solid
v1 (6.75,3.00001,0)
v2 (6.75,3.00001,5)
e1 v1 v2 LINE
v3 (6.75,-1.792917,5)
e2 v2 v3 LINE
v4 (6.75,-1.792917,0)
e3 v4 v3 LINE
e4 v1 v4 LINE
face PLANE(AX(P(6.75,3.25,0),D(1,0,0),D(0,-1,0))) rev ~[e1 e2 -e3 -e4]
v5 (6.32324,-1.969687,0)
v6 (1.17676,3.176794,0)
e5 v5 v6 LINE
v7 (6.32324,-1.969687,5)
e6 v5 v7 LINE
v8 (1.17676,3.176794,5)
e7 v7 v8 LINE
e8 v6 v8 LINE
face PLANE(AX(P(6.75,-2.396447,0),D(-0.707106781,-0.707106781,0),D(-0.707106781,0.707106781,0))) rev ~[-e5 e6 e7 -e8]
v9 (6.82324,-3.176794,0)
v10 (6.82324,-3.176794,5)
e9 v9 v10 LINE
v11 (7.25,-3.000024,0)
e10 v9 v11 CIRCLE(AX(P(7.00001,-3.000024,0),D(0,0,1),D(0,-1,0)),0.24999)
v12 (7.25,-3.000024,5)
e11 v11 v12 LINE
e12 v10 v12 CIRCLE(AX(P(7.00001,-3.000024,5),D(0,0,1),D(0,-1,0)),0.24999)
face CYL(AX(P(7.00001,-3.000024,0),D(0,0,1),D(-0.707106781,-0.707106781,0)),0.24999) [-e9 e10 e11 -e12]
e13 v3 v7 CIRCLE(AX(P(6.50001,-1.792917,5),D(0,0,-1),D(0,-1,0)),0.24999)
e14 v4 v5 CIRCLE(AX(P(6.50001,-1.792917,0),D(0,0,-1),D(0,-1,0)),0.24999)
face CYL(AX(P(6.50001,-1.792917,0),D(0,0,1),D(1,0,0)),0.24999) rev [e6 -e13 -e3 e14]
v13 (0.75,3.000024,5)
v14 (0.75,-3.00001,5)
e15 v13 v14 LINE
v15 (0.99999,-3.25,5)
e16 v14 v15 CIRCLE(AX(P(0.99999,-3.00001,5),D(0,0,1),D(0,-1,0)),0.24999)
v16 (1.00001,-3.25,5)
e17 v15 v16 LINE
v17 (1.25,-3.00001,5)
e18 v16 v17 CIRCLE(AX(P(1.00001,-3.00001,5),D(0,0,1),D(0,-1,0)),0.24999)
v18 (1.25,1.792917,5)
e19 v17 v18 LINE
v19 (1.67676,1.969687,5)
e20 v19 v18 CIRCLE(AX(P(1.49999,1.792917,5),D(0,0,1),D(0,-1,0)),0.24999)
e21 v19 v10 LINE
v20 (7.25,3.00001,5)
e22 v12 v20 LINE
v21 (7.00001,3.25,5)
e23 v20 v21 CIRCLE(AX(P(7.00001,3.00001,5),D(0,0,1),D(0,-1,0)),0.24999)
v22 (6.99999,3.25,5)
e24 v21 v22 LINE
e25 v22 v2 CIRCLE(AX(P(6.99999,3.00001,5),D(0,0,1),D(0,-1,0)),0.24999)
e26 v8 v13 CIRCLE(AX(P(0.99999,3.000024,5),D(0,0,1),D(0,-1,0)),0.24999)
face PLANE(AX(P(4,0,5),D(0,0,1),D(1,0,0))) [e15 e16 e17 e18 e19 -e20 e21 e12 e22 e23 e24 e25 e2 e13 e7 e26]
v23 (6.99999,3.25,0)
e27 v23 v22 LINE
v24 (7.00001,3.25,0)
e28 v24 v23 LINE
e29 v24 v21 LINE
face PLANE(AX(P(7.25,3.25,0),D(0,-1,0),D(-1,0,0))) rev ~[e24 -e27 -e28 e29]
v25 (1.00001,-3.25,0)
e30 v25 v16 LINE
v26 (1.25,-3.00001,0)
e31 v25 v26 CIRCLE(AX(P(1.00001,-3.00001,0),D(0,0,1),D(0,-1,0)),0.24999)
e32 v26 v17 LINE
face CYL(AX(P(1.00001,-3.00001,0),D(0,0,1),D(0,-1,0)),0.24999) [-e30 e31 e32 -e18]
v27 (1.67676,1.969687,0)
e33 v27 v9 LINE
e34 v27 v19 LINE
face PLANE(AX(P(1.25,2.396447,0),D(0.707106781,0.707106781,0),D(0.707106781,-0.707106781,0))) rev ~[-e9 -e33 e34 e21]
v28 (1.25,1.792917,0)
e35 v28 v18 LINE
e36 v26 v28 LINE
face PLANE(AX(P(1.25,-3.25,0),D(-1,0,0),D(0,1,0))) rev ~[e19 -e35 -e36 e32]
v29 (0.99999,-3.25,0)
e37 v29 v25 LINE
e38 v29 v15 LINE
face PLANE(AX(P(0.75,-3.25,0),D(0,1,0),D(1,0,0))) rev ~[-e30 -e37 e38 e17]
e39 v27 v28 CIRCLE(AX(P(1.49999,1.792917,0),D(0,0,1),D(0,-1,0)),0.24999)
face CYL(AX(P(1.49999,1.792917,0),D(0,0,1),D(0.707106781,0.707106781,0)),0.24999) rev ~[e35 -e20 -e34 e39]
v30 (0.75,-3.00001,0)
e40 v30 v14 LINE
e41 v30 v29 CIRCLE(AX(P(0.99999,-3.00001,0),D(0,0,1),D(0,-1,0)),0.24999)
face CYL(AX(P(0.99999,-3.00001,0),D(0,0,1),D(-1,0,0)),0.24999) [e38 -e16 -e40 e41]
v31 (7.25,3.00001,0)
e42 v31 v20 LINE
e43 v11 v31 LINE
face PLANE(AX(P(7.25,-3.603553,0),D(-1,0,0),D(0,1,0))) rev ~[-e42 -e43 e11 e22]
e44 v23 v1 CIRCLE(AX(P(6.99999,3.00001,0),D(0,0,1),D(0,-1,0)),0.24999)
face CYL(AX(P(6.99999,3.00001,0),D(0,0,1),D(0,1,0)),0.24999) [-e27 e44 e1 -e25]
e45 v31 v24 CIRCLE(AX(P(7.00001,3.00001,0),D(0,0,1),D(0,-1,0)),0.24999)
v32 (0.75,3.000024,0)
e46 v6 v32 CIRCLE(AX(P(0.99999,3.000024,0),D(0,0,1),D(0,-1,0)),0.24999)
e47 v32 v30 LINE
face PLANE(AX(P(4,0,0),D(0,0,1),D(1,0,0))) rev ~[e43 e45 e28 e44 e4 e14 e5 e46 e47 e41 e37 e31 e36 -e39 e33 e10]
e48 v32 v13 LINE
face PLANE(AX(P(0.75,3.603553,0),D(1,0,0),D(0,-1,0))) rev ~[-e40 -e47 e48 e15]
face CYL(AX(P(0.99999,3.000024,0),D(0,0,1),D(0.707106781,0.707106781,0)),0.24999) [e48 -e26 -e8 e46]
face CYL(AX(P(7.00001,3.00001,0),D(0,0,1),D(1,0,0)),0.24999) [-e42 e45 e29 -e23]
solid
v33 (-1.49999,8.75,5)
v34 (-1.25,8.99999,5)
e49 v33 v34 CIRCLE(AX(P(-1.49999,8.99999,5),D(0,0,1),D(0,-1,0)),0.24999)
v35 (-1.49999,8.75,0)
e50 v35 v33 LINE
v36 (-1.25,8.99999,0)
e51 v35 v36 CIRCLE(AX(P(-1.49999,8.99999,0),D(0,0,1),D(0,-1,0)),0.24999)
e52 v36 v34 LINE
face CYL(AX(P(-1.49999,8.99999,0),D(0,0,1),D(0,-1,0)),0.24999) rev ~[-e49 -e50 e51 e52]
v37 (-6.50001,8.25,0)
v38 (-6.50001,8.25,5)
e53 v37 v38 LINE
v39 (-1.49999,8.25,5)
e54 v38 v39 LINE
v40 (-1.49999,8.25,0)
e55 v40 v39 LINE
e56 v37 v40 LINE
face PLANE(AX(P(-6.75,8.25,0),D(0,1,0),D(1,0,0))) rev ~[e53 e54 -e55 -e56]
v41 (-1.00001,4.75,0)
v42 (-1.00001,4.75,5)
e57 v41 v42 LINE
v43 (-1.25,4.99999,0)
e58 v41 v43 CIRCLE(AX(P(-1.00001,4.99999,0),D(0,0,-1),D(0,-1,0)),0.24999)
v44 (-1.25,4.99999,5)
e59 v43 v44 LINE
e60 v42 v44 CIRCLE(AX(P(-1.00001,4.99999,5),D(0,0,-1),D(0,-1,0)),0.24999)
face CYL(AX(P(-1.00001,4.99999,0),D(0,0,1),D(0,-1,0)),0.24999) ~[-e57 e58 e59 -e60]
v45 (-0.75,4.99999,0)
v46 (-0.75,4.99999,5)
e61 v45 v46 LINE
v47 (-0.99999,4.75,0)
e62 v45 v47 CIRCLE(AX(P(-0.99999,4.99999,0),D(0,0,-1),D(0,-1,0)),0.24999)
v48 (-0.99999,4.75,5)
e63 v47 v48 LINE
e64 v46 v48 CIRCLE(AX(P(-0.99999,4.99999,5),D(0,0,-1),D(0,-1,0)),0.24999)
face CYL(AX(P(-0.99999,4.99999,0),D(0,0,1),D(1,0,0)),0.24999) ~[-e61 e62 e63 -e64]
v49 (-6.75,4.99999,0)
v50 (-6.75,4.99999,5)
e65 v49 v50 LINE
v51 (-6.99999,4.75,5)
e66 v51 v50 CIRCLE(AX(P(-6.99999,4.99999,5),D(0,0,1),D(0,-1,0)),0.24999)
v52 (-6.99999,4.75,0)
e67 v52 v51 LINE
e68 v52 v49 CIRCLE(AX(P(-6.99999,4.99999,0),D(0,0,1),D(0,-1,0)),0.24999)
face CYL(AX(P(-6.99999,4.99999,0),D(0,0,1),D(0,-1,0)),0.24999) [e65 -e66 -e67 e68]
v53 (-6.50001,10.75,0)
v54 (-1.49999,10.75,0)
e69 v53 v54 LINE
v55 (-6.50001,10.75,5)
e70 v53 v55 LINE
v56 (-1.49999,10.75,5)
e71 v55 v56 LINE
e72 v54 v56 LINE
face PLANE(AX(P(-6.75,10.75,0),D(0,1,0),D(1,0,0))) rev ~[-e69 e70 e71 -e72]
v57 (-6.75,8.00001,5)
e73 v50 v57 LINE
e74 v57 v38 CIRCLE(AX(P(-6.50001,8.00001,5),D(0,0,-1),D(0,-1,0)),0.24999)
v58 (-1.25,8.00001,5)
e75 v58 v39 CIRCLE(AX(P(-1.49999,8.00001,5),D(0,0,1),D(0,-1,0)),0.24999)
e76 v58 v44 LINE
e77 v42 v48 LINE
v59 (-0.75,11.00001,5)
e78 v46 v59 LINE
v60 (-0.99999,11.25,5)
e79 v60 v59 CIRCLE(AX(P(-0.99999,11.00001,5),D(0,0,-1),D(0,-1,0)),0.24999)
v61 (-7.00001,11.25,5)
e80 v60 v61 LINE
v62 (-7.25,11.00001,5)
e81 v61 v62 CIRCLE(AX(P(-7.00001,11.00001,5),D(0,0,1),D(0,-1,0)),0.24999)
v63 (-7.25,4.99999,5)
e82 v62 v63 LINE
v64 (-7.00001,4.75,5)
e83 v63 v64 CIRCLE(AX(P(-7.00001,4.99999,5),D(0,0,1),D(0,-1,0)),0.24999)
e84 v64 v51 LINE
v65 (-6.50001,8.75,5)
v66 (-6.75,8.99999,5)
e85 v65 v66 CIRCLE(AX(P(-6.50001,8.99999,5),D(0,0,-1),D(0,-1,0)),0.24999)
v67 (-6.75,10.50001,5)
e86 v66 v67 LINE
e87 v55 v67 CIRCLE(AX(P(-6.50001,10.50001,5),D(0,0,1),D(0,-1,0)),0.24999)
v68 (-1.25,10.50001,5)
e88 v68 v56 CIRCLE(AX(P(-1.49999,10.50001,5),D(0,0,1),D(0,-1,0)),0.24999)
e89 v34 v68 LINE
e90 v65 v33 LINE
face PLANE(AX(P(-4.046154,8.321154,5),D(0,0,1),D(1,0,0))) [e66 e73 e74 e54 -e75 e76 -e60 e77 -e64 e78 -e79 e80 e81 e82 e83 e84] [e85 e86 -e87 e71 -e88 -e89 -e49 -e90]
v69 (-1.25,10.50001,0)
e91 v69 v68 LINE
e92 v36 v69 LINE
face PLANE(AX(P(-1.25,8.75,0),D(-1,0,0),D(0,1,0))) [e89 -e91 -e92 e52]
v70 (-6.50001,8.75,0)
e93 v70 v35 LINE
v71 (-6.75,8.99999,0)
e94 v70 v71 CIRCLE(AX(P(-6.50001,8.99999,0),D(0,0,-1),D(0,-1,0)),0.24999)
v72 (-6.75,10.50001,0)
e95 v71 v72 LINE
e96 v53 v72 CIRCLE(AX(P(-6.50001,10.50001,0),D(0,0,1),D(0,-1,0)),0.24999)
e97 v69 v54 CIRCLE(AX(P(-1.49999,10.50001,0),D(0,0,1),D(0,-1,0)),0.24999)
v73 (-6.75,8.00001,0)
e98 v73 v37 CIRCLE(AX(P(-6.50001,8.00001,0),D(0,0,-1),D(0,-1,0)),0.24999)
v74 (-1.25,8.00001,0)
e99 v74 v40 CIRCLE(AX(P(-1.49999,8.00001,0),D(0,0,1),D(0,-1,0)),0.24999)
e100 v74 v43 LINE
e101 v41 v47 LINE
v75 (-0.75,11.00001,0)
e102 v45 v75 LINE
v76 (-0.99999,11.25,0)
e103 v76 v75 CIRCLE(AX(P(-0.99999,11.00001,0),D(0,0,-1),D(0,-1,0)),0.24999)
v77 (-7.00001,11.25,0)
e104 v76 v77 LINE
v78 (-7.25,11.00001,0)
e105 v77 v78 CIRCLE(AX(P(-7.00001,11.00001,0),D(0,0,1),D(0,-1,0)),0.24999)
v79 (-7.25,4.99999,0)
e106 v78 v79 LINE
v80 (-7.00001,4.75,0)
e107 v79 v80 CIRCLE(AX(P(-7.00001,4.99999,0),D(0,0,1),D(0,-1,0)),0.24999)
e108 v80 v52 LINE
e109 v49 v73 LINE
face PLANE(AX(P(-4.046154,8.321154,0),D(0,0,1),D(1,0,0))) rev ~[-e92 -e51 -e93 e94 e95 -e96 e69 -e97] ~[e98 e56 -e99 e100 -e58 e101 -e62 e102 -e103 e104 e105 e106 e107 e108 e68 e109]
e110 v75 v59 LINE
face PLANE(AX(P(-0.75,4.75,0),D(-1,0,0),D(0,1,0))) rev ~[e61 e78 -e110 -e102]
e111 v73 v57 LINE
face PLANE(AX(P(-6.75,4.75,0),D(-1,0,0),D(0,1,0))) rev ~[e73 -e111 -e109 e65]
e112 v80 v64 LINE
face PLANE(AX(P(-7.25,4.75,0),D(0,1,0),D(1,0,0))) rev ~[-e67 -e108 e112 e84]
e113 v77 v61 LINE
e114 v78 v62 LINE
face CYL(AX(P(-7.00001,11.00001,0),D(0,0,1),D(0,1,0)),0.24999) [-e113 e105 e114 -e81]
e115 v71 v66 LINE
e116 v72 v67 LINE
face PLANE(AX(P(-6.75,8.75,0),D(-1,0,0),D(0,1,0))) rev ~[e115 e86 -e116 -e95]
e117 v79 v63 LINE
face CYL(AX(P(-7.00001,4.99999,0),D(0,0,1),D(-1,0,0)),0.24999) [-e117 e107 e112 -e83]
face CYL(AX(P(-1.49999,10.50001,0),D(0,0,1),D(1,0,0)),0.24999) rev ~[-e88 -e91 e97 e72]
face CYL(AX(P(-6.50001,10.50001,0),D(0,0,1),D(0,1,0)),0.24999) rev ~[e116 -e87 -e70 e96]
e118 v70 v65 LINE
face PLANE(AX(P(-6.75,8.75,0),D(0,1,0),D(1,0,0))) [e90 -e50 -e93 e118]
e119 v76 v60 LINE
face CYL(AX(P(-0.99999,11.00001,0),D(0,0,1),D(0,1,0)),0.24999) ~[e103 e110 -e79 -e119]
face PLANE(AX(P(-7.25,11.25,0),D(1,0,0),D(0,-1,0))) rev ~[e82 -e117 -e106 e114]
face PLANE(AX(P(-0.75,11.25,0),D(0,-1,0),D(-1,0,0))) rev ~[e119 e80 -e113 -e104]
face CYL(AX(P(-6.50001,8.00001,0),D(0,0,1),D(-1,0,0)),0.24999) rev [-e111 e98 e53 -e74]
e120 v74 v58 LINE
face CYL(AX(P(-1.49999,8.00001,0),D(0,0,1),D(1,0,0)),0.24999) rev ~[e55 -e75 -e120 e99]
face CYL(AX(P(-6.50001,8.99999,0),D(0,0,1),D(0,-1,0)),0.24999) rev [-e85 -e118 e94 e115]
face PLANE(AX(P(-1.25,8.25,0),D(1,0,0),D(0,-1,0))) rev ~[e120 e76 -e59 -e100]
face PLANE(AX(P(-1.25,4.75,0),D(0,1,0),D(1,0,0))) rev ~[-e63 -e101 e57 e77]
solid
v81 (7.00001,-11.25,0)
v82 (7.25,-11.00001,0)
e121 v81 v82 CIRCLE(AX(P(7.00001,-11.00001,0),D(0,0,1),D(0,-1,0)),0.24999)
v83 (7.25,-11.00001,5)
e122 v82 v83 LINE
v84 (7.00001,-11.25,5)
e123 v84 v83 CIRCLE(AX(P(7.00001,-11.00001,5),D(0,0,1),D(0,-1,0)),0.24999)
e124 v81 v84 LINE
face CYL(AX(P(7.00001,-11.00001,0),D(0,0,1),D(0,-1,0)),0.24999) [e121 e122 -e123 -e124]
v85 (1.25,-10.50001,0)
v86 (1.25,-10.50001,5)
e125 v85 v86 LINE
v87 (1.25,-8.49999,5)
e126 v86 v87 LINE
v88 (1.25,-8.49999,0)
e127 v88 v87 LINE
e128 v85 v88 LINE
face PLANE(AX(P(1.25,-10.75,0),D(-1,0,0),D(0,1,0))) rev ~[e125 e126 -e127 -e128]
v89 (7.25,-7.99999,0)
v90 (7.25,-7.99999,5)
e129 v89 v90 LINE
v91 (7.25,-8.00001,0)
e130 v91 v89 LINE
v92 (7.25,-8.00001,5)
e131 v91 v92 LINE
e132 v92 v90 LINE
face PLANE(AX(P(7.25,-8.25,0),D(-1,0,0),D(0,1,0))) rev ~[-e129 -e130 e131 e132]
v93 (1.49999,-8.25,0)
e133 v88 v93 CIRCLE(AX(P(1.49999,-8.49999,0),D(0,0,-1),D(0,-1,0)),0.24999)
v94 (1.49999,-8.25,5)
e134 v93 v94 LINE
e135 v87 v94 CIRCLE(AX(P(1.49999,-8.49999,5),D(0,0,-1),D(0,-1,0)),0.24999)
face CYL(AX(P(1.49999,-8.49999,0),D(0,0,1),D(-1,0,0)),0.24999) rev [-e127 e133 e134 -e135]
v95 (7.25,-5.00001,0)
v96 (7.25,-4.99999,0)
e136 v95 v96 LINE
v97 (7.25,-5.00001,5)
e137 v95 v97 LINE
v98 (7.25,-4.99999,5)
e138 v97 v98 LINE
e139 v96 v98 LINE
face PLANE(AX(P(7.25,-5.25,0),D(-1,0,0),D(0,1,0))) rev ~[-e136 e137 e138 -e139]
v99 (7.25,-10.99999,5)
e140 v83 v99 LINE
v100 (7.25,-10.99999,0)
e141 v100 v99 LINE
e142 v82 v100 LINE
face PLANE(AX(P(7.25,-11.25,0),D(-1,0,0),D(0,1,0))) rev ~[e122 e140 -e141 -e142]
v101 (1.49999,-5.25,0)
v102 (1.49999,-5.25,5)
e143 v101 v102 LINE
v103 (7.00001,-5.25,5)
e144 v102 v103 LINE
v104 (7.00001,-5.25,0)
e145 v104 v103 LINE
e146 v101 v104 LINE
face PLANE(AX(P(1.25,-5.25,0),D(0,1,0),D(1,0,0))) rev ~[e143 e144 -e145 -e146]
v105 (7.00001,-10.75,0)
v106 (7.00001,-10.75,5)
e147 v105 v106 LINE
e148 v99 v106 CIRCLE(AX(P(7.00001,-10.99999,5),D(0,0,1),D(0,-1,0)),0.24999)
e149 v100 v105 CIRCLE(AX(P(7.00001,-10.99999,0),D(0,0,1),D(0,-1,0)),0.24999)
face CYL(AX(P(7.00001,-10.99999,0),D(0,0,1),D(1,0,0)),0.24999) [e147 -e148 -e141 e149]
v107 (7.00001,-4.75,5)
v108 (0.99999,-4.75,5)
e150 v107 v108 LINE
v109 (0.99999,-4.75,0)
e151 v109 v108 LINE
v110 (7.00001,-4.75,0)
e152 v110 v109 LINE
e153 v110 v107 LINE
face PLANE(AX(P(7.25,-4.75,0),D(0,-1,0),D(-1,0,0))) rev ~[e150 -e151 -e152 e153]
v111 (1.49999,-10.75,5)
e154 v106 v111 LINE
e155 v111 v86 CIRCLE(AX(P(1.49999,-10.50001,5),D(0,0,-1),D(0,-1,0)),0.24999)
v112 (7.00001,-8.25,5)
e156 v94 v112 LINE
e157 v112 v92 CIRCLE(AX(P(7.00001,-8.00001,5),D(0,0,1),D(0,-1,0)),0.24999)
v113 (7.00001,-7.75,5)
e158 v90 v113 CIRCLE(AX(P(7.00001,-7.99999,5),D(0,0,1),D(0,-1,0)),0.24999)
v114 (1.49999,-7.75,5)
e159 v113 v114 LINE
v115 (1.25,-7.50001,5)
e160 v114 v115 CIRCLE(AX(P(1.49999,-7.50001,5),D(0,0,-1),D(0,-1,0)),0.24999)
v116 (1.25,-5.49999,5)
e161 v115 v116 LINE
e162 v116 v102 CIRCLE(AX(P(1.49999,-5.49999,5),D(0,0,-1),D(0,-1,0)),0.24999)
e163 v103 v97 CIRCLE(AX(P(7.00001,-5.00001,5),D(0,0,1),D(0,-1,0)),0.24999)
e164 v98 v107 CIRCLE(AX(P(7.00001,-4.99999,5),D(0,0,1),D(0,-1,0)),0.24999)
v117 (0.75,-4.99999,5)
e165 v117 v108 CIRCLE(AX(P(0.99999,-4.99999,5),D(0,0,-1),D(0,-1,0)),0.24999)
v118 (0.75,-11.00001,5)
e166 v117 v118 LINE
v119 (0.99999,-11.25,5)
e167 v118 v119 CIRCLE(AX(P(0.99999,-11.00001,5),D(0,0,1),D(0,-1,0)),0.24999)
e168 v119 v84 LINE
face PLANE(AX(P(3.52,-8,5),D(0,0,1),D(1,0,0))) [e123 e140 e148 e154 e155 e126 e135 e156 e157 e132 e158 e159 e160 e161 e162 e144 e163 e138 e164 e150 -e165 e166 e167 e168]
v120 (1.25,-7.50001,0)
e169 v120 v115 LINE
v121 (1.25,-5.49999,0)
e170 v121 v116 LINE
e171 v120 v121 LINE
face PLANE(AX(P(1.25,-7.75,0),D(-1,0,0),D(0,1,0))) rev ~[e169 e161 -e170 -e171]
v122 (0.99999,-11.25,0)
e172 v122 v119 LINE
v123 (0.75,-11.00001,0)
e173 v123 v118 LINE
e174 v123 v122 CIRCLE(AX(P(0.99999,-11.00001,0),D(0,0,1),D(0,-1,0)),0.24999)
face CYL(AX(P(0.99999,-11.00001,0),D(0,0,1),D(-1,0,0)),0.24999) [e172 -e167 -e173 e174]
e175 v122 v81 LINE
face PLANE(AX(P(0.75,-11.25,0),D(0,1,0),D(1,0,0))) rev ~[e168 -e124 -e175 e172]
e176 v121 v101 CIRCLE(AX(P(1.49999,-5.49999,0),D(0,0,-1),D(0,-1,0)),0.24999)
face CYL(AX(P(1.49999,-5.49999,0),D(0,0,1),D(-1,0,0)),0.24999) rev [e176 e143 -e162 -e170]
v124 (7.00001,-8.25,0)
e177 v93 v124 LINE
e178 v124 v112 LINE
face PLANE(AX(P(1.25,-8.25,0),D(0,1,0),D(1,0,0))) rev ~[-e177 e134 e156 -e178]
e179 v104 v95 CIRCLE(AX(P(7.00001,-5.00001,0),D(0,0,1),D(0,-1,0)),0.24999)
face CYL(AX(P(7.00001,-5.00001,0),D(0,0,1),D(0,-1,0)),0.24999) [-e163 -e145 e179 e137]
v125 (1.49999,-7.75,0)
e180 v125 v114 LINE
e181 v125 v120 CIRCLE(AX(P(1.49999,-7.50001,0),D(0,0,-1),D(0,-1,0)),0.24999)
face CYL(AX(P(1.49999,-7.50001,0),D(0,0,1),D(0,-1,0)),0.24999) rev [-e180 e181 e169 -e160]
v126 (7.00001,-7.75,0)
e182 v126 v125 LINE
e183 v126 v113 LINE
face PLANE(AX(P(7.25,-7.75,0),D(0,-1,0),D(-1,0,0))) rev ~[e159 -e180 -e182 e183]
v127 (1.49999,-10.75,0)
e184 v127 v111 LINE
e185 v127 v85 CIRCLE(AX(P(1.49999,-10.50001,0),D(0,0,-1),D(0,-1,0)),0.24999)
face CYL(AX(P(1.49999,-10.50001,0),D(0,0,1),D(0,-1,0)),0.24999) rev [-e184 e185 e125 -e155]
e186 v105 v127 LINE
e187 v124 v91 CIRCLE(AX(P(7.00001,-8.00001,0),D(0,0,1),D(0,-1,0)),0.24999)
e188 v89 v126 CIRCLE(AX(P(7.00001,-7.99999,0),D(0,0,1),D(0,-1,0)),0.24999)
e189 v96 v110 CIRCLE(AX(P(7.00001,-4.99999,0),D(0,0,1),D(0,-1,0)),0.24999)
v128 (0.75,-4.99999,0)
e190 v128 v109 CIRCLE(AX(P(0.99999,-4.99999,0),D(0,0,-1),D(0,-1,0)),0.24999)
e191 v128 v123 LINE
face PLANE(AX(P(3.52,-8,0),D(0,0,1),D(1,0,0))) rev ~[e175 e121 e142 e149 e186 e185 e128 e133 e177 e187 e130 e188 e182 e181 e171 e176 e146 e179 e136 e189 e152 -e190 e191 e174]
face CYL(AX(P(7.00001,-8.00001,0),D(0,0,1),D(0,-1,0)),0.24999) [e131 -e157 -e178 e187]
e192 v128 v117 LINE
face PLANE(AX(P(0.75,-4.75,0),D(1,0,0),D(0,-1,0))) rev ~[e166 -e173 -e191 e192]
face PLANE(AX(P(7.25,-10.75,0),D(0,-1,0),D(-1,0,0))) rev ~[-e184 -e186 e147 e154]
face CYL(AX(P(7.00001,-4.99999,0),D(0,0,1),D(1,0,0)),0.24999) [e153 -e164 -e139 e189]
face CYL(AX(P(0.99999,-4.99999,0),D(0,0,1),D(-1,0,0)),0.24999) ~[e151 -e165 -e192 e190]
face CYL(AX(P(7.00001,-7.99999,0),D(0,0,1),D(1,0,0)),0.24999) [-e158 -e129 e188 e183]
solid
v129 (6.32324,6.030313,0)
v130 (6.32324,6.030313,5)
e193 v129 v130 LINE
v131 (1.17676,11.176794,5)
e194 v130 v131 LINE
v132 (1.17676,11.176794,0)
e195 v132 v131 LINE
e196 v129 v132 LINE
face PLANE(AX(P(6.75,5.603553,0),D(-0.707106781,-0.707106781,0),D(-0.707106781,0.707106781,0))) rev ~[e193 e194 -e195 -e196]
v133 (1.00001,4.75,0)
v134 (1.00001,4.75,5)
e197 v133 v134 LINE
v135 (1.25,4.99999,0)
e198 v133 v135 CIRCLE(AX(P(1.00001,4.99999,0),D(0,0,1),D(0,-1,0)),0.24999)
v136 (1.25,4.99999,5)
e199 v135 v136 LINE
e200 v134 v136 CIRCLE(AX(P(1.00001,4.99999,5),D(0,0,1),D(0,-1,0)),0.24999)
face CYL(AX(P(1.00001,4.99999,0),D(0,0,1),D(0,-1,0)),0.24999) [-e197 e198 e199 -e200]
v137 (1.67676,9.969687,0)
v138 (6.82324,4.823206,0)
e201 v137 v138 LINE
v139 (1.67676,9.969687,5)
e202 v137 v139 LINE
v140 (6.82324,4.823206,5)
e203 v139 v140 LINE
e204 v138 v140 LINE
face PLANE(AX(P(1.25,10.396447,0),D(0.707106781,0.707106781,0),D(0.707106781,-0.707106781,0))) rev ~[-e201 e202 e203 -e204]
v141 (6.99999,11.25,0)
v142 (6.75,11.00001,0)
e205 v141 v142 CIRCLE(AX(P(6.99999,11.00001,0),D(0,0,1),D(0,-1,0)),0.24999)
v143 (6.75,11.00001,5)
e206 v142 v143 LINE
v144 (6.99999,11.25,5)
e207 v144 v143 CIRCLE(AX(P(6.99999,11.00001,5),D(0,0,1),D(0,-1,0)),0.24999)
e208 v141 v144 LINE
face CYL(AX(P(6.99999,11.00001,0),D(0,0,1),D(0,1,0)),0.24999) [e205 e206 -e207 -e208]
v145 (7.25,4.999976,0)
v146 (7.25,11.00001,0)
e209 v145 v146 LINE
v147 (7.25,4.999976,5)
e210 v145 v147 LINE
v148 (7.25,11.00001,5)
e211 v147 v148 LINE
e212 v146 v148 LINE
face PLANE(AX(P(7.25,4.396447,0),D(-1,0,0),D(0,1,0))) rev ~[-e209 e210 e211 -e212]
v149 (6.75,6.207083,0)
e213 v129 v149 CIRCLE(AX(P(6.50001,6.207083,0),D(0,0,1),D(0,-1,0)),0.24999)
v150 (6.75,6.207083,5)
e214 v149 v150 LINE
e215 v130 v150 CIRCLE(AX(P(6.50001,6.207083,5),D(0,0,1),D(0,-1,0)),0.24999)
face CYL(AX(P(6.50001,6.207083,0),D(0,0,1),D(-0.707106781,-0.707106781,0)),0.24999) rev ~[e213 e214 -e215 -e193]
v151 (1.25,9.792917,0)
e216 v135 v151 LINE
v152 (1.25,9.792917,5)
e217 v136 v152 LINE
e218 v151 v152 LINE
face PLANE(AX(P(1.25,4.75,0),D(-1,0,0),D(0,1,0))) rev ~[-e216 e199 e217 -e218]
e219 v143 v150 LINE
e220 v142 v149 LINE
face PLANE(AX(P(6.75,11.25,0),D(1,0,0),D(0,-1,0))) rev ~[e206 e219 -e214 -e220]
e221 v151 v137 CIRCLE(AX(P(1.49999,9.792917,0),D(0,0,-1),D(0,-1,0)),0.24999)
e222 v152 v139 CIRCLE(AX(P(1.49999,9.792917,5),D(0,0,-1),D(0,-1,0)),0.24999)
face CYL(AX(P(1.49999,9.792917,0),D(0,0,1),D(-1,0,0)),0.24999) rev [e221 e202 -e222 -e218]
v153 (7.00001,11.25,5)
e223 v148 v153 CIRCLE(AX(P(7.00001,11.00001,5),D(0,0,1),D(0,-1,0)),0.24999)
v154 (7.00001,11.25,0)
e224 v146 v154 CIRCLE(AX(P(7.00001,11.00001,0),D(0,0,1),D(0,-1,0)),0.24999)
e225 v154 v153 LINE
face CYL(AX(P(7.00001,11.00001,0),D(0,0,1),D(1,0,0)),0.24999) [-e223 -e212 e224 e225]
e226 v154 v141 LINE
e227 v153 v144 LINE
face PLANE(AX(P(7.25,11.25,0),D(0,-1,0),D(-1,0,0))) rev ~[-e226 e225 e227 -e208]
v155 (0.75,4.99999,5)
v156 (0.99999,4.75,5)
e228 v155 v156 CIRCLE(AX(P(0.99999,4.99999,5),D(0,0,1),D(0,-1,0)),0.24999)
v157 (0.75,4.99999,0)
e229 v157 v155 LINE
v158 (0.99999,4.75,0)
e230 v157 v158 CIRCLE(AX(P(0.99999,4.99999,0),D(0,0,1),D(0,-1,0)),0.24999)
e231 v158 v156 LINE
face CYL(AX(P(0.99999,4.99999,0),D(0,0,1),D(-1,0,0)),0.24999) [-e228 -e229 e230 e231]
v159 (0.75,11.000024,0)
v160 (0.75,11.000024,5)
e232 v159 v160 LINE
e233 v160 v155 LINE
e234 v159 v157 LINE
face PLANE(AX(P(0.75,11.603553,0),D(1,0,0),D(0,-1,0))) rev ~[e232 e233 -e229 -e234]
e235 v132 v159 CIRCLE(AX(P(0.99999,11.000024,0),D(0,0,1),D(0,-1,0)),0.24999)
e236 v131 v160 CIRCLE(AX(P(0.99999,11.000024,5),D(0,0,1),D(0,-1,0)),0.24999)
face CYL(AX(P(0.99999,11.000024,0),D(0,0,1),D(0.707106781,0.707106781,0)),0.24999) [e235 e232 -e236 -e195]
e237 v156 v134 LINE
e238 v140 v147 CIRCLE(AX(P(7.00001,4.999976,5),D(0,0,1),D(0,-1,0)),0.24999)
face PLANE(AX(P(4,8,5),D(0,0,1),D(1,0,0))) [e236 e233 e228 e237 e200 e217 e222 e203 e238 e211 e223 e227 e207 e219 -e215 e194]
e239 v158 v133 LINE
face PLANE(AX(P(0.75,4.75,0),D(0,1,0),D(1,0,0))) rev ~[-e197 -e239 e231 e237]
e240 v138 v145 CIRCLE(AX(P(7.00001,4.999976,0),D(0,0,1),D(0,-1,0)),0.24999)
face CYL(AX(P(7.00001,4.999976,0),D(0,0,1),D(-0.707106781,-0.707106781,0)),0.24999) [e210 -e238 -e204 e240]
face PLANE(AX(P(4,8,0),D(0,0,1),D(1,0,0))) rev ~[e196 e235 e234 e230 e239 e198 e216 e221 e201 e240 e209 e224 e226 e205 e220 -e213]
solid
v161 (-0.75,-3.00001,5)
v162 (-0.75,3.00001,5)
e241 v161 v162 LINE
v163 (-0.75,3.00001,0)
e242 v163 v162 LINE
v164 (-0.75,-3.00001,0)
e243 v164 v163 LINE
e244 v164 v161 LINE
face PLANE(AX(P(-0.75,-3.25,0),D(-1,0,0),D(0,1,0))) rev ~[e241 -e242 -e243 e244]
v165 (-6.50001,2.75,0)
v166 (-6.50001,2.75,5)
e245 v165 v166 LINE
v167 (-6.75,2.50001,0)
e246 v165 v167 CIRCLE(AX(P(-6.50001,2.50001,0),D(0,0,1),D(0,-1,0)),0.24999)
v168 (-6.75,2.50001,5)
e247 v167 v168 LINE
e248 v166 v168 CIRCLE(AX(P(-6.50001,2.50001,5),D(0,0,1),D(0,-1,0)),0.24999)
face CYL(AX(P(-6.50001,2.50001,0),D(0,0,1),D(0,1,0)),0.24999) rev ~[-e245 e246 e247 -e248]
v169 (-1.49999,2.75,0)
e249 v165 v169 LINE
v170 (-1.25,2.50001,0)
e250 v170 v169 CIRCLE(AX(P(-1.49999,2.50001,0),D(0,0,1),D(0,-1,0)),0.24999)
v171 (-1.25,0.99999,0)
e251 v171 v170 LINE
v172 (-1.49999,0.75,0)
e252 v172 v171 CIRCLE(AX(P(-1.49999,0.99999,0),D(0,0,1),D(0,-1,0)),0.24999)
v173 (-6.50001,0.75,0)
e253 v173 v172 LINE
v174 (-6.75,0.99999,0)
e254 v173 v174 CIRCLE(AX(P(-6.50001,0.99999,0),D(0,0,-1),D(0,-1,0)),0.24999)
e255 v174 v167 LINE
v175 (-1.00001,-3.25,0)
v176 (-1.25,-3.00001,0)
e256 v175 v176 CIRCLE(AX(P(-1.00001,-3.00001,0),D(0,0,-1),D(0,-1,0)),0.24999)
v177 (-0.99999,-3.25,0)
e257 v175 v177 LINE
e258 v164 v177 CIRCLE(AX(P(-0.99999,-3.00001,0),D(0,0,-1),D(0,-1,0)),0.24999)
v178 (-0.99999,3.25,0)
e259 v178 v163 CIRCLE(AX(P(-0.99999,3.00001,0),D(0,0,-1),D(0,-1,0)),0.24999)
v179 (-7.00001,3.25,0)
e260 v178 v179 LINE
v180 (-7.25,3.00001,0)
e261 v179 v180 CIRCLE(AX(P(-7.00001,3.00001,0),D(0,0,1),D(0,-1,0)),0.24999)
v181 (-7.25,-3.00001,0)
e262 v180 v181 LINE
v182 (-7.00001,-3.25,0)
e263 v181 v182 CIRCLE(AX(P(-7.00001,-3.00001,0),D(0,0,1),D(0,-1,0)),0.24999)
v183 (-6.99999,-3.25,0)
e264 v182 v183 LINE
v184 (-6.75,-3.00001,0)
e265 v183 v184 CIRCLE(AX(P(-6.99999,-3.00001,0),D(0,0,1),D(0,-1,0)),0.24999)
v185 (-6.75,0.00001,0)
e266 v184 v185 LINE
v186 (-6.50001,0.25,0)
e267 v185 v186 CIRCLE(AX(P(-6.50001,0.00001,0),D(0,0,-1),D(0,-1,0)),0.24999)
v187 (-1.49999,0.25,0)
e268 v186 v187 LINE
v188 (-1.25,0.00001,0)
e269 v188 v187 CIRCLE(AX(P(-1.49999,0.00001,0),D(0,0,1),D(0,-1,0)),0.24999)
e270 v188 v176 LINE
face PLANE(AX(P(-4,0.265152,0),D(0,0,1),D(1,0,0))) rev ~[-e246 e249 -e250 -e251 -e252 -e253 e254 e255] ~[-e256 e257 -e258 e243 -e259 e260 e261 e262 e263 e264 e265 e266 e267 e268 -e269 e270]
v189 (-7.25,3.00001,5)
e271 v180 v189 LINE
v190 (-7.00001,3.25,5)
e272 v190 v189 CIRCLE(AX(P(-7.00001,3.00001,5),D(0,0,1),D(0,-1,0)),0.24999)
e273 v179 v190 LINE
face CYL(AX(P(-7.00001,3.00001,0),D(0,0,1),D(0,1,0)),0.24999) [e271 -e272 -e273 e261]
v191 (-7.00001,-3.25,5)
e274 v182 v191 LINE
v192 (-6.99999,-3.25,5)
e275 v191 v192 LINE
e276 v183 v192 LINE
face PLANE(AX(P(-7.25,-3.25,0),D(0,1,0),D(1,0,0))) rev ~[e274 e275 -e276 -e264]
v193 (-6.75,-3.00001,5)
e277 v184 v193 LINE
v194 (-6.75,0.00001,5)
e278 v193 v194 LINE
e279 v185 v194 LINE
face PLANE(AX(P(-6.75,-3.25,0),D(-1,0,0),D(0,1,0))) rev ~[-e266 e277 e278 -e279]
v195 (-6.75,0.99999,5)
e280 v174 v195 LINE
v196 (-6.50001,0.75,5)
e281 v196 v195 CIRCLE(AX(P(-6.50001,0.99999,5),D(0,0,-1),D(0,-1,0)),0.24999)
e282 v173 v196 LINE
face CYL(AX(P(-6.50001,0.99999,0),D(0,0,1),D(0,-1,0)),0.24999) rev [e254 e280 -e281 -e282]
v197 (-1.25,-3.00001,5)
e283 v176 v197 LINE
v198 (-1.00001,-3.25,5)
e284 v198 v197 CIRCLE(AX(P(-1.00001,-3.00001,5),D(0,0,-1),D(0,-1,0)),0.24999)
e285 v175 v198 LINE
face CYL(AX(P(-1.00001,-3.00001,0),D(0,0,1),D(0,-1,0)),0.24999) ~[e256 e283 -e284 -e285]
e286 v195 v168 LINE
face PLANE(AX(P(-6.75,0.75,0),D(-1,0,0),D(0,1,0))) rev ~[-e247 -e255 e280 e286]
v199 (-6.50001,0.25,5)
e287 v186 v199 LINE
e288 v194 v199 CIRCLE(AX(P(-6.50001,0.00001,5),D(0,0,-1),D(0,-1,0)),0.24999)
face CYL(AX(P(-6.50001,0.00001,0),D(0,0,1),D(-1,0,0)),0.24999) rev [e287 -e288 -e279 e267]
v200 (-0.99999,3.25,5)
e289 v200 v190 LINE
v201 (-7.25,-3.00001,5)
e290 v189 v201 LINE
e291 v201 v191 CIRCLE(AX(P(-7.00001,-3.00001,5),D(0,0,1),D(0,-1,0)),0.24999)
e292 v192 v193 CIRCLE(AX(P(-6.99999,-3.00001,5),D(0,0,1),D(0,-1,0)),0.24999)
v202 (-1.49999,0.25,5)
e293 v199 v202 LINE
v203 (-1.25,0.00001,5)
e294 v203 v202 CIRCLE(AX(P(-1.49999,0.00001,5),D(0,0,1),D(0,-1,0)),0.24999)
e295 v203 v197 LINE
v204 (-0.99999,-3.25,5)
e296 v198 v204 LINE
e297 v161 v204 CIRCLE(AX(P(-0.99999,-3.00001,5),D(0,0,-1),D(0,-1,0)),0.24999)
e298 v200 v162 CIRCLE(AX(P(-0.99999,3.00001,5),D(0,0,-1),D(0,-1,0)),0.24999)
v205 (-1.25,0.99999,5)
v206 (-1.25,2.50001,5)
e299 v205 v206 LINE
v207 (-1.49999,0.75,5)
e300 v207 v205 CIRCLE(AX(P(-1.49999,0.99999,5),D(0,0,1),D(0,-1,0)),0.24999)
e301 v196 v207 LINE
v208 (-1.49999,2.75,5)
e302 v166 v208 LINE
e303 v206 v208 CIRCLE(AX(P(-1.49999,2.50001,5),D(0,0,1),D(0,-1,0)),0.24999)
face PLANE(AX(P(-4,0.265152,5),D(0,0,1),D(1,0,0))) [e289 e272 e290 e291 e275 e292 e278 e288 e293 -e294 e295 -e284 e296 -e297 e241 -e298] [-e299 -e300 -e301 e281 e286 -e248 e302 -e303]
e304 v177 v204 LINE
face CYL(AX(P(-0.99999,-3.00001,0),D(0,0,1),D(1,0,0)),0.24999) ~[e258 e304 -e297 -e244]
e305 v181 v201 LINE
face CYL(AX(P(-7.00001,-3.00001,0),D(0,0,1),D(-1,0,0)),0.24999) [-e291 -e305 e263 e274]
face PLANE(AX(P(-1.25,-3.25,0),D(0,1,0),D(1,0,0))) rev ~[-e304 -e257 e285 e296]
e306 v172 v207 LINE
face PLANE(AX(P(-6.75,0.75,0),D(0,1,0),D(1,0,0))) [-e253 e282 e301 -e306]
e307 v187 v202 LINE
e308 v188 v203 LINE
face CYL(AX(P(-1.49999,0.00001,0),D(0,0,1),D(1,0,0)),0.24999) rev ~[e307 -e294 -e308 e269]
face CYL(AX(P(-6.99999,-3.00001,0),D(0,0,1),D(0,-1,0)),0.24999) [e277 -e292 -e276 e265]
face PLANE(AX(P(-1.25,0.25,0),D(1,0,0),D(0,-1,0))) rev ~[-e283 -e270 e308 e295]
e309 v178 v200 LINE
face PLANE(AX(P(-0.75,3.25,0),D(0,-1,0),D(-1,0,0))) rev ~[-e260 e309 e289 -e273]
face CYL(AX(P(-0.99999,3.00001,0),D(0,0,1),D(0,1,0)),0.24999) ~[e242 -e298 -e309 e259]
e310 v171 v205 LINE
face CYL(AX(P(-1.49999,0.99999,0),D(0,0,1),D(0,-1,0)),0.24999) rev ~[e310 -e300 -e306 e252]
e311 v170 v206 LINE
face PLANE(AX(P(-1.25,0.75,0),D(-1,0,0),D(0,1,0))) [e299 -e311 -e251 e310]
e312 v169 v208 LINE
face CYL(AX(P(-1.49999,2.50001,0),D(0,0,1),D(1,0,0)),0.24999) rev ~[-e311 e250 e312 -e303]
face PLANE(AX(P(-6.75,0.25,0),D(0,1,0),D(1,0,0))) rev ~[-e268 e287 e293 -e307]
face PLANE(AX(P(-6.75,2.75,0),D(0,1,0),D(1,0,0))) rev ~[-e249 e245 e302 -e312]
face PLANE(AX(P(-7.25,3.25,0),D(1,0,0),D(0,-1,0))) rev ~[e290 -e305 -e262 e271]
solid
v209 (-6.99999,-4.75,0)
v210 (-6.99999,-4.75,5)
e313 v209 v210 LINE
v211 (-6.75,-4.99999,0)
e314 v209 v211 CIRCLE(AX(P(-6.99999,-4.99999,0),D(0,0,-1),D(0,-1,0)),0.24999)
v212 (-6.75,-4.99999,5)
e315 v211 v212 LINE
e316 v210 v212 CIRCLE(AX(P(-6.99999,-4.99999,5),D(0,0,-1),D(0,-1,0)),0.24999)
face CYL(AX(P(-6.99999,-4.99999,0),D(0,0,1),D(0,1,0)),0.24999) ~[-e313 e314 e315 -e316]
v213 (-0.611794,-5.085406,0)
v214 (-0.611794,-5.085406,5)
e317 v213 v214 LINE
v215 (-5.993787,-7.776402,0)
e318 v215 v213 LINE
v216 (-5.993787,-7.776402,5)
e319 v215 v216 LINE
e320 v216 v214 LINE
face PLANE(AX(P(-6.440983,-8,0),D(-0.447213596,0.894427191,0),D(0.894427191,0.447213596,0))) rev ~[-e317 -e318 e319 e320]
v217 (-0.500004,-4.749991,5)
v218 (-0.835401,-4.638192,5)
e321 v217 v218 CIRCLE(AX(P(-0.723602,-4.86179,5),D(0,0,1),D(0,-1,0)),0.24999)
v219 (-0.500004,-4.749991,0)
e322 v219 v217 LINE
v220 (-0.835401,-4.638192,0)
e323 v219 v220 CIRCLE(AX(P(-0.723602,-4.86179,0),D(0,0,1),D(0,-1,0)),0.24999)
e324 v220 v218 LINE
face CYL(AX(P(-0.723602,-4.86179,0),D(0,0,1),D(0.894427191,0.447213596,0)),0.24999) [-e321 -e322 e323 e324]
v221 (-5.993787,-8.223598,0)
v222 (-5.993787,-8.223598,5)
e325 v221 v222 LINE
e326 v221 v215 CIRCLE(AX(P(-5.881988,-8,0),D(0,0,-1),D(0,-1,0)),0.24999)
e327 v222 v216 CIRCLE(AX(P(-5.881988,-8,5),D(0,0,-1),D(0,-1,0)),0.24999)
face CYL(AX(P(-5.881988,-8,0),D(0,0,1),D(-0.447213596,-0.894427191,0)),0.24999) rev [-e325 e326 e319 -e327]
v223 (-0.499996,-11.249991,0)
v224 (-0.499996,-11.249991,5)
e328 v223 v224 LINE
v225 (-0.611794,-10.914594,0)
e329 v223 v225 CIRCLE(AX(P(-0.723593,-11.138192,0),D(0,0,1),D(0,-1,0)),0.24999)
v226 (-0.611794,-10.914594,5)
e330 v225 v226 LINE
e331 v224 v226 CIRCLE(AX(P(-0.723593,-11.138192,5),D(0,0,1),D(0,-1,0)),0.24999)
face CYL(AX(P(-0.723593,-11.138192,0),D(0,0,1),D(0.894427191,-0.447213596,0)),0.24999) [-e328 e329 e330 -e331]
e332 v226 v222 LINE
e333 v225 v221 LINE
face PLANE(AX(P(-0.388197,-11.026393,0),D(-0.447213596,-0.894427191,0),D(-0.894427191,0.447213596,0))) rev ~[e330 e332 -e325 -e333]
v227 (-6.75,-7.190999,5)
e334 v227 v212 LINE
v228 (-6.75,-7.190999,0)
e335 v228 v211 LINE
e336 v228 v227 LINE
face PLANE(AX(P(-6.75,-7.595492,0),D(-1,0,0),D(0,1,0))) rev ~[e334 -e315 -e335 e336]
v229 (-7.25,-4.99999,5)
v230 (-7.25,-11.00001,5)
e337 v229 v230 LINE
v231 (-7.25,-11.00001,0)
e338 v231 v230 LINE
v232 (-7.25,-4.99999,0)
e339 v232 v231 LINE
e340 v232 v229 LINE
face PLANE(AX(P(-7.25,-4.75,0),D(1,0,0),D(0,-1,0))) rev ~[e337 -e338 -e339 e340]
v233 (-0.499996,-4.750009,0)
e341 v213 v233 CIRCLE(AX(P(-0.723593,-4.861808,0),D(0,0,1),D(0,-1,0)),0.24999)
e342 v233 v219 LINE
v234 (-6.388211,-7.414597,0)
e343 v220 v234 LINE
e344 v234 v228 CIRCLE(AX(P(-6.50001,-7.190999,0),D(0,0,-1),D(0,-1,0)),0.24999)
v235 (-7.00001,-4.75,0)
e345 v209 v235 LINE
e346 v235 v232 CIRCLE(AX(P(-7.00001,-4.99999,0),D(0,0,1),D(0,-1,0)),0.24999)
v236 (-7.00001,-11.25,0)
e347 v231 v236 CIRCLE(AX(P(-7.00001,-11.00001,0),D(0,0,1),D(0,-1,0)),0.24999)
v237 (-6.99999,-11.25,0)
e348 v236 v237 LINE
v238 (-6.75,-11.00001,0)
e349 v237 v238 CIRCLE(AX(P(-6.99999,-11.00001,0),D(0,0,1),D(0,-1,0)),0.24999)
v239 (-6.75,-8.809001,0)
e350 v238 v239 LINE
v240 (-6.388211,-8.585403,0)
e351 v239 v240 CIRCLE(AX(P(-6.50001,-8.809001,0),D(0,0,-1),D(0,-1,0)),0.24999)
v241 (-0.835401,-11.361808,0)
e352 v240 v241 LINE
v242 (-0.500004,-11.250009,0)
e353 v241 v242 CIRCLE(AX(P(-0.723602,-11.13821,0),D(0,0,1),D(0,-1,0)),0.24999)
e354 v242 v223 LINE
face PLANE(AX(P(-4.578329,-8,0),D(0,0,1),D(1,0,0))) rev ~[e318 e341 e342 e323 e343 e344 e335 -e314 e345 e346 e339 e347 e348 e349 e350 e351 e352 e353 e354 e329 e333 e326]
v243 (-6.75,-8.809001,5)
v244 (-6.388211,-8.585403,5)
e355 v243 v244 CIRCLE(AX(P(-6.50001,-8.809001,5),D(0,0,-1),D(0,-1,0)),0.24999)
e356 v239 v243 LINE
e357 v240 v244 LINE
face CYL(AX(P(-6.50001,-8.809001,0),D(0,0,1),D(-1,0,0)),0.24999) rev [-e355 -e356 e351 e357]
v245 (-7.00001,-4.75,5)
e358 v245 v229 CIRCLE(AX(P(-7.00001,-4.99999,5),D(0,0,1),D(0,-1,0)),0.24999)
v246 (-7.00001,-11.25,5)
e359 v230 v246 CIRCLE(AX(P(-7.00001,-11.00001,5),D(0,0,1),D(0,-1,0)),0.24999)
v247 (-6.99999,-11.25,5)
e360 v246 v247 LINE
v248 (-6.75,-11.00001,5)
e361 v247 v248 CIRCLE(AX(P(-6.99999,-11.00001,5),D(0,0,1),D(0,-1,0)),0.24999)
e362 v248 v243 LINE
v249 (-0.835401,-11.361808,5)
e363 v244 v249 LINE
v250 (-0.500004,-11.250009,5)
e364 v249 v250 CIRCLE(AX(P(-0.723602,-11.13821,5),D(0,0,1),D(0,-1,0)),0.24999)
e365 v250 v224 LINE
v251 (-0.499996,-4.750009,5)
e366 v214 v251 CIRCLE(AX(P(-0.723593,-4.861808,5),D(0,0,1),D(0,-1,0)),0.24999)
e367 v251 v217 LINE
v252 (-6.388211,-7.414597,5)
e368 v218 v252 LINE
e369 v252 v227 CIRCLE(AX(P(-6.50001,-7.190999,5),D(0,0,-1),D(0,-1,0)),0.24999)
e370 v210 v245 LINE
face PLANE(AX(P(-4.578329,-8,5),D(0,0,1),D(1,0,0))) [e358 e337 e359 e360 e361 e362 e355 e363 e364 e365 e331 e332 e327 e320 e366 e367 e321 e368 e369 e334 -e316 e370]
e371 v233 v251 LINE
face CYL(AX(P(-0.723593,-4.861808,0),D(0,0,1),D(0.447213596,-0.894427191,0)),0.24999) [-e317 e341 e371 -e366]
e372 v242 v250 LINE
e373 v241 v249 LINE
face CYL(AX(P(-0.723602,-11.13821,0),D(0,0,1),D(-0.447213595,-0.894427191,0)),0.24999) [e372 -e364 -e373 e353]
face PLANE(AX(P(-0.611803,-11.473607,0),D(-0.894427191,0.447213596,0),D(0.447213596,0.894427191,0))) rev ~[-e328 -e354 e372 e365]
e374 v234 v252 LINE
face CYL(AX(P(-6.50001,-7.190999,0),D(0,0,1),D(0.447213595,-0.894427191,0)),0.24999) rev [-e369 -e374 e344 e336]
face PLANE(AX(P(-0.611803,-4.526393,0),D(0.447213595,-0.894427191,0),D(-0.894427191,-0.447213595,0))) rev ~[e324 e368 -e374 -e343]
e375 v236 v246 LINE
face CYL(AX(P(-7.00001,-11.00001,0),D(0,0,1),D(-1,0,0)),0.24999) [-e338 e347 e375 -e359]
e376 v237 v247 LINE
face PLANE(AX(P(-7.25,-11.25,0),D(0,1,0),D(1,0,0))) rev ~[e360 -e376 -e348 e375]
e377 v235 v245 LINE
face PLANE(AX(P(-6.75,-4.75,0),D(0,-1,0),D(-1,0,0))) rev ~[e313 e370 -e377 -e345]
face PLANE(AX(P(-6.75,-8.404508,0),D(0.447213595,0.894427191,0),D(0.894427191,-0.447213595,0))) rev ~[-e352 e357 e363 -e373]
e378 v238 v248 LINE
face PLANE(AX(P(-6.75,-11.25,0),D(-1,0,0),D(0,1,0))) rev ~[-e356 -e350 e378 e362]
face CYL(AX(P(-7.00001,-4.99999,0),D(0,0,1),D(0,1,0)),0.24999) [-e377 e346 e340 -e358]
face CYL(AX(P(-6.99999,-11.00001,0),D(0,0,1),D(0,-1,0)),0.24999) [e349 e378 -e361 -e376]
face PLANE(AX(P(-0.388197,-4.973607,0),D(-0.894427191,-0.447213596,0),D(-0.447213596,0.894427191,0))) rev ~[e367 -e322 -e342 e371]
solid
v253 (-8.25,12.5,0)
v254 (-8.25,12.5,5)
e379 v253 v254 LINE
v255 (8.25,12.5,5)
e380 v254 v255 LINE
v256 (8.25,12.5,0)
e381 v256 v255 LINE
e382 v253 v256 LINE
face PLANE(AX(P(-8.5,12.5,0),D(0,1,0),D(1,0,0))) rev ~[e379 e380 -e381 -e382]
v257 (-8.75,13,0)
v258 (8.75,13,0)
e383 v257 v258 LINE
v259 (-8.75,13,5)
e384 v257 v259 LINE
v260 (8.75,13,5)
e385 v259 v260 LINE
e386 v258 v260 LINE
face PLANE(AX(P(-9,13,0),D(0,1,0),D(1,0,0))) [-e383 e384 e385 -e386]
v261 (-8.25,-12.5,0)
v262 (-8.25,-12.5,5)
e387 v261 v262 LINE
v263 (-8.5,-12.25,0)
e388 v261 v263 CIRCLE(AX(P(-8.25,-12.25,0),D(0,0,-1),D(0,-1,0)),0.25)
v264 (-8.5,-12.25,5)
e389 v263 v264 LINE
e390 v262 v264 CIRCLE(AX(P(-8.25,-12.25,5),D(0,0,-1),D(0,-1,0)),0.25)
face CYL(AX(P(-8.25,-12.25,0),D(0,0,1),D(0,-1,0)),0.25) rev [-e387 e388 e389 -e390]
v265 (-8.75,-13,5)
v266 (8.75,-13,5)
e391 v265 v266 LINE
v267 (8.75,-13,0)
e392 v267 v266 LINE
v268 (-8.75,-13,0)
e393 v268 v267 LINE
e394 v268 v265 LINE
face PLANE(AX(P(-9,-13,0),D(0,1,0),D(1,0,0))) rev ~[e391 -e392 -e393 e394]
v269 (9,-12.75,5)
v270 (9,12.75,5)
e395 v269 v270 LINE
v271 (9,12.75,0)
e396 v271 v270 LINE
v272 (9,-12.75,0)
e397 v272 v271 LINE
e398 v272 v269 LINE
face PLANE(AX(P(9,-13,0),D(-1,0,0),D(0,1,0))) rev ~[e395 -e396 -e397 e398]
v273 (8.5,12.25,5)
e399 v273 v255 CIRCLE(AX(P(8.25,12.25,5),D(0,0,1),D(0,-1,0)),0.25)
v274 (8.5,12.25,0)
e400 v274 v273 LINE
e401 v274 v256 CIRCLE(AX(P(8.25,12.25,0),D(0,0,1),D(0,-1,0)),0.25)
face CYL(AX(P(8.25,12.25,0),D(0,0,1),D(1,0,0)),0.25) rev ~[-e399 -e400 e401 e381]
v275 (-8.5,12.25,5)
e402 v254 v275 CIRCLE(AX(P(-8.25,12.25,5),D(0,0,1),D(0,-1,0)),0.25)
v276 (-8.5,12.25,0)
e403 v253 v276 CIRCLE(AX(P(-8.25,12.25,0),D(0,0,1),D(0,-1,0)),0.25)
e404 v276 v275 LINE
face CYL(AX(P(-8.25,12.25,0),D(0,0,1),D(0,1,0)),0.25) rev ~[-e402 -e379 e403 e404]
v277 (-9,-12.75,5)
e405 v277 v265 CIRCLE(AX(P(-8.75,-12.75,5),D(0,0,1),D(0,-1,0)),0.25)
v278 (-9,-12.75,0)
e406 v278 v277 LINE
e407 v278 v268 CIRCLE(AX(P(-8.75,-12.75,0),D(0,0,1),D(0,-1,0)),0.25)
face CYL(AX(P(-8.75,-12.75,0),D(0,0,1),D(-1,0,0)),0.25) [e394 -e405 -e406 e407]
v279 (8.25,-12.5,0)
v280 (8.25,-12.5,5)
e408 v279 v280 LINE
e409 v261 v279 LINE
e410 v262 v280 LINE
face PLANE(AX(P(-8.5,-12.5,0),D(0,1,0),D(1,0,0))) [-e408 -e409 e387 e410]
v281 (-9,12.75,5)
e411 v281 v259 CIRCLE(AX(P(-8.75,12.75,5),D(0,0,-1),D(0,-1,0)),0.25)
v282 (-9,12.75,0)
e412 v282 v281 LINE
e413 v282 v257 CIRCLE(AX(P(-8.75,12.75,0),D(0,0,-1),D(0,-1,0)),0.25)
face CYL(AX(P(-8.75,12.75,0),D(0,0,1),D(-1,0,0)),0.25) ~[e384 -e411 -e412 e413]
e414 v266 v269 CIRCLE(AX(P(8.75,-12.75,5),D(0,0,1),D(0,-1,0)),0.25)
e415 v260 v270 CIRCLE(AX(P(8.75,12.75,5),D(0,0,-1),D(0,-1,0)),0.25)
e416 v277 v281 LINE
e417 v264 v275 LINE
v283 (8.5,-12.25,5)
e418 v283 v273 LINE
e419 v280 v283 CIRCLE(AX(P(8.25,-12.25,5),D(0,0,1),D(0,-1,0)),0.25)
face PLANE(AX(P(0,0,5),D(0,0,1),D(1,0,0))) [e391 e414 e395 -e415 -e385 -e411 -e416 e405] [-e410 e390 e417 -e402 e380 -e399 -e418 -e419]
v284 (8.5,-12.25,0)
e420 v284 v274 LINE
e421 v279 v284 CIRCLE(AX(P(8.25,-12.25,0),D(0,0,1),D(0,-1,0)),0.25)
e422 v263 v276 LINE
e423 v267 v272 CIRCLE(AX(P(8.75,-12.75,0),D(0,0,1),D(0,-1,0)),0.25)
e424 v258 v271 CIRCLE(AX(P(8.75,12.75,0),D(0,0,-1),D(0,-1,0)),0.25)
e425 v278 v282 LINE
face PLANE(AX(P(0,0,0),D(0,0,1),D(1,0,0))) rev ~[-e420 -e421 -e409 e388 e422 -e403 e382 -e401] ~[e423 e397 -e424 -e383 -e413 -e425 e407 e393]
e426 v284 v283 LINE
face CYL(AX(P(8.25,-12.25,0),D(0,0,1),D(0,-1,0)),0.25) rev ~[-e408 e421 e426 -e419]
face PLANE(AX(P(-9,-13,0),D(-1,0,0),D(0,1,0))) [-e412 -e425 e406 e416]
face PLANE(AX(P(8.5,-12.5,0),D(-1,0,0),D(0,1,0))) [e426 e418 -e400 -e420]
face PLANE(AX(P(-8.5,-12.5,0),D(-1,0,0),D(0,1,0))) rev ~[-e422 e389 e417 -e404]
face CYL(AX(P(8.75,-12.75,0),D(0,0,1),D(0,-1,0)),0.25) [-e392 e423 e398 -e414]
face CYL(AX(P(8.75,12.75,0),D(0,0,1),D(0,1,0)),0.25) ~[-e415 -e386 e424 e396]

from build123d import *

# Parameters (mm, degrees)
F1_W     = 18
F1_H     = 26
F1_W_2   = 17
F1_H_2   = 25
F2_DEPTH = 5
F1_W_3   = 6
F1_H_3   = 2.5
F1_W_4   = 5.5
F1_H_4   = 2
F3_R     = 0.25
F4_R     = 0.24999
F5_R     = 0.24999
F6_R     = 0.24999
F7_R     = 0.24999
F8_R     = 0.24999
F9_R     = 0.24999


# Not quite as in the source:
# - a fillet or chamfer is up to 0.001 mm smaller than in the source, because OpenCascade refuses the exact size


with BuildPart() as f2:
    # F1 (on face) → F2 (new body)
    with BuildSketch(Plane.XY):
        Rectangle(F1_W, F1_H)
        Rectangle(F1_W_2, F1_H_2, mode=Mode.SUBTRACT)
    extrude(amount=F2_DEPTH)

    # F3
    f3_edges = [f2.edges().sort_by_distance(p)[0] for p in [
        (9, 13, 2.5),
        (-9, 13, 2.5),
        (8.5, 12.5, 2.5),
        (-8.5, 12.5, 2.5),
        (9, -13, 2.5),
        (-9, -13, 2.5),
        (8.5, -12.5, 2.5),
        (-8.5, -12.5, 2.5),
    ]]
    fillet(f3_edges, radius=F3_R)


with BuildPart() as f2b:
    # F1 (on face) → F2, piece 2 (new body)
    with BuildSketch(Plane.XY):
        Polygon((-0.75, 5), (-0.75, 11.25), (-7.25, 11.25), (-7.25, 5), (-7.25, 4.75), (-6.75, 4.75), (-6.75, 5), (-6.75, 8.25), (-1.25, 8.25), (-1.25, 5), (-1, 5), align=None)
        with Locations((-4, 9.75)):
            Rectangle(F1_W_3, F1_H_3, mode=Mode.SUBTRACT)
        Polygon((-0.75, 4.75), (-0.75, 5), (-1, 5), (-1.25, 5), (-1.25, 4.75), align=None)
        with Locations((-4, 9.75)):
            Rectangle(F1_W_3, F1_H_3)
        with Locations((-4, 9.75)):
            Rectangle(F1_W_4, F1_H_4, mode=Mode.SUBTRACT)
    extrude(amount=F2_DEPTH)

    # F4 (radius 0.25 in the source; OpenCascade refuses exactly that, so slightly less here)
    f4_edges = [f2b.edges().sort_by_distance(p)[0] for p in [
        (-6.75, 10.75, 2.5),
        (-6.75, 8.25, 2.5),
        (-6.75, 4.75, 2.5),
        (-0.75, 4.75, 2.5),
        (-7.25, 4.75, 2.5),
        (-1.25, 4.75, 2.5),
        (-0.75, 11.25, 2.5),
        (-1.25, 10.75, 2.5),
        (-1.25, 8.25, 2.5),
        (-7.25, 11.25, 2.5),
        (-1.25, 8.75, 2.5),
        (-6.75, 8.75, 2.5),
    ]]
    fillet(f4_edges, radius=F4_R)


with BuildPart() as f2c:
    # F1 (on face) → F2, piece 3 (new body)
    with BuildSketch(Plane.XY):
        Polygon((6.75, 11), (6.75, 5.6035533906), (0.75, 11.6035533906), (0.75, 5), (0.75, 4.75), (1.25, 4.75), (1.25, 5), (1.25, 10.3964466094), (7.25, 4.3964466094), (7.25, 11), (7.25, 11.25), (6.75, 11.25), align=None)
    extrude(amount=F2_DEPTH)

    # F5 (radius 0.25 in the source; OpenCascade refuses exactly that, so slightly less here)
    f5_edges = [f2c.edges().sort_by_distance(p)[0] for p in [
        (7.25, 11.25, 2.5),
        (6.75, 11.25, 2.5),
        (0.75, 11.603553, 2.5),
        (7.25, 4.396447, 2.5),
        (1.25, 4.75, 2.5),
        (0.75, 4.75, 2.5),
        (6.75, 5.603553, 2.5),
        (1.25, 10.396447, 2.5),
    ]]
    fillet(f5_edges, radius=F5_R)


with BuildPart() as f2d:
    # F1 (on face) → F2, piece 4 (new body)
    with BuildSketch(Plane.XY):
        Polygon((1.25, 2.3964466094), (7.25, -3.6035533906), (7.25, 3), (7.25, 3.25), (6.75, 3.25), (6.75, 3), (6.75, -2.3964466094), (0.75, 3.6035533906), (0.75, -3), (0.75, -3.25), (1.25, -3.25), (1.25, -3), align=None)
    extrude(amount=F2_DEPTH)

    # F6 (radius 0.25 in the source; OpenCascade refuses exactly that, so slightly less here)
    f6_edges = [f2d.edges().sort_by_distance(p)[0] for p in [
        (7.25, -3.603553, 2.5),
        (1.25, -3.25, 2.5),
        (0.75, -3.25, 2.5),
        (7.25, 3.25, 2.5),
        (1.25, 2.396447, 2.5),
        (0.75, 3.603553, 2.5),
        (6.75, 3.25, 2.5),
        (6.75, -2.396447, 2.5),
    ]]
    fillet(f6_edges, radius=F6_R)


with BuildPart() as f2e:
    # F1 (on face) → F2, piece 5 (new body)
    with BuildSketch(Plane.XY):
        Polygon((-0.75, 3.25), (-7.25, 3.25), (-7.25, -3), (-7.25, -3.25), (-6.75, -3.25), (-6.75, -3), (-6.75, 0.25), (-1.25, 0.25), (-1.25, -3), (-1.25, -3.25), (-0.75, -3.25), (-0.75, -3), align=None)
        with Locations((-4, 1.75)):
            Rectangle(F1_W_3, F1_H_3, mode=Mode.SUBTRACT)
        with Locations((-4, 1.75)):
            Rectangle(F1_W_3, F1_H_3)
        with Locations((-4, 1.75)):
            Rectangle(F1_W_4, F1_H_4, mode=Mode.SUBTRACT)
    extrude(amount=F2_DEPTH)

    # F7 (radius 0.25 in the source; OpenCascade refuses exactly that, so slightly less here)
    f7_edges = [f2e.edges().sort_by_distance(p)[0] for p in [
        (-0.75, 3.25, 2.5),
        (-7.25, 3.25, 2.5),
        (-7.25, -3.25, 2.5),
        (-1.25, -3.25, 2.5),
        (-1.25, 0.75, 2.5),
        (-6.75, 0.75, 2.5),
        (-1.25, 0.25, 2.5),
        (-6.75, 0.25, 2.5),
        (-6.75, -3.25, 2.5),
        (-6.75, 2.75, 2.5),
        (-1.25, 2.75, 2.5),
        (-0.75, -3.25, 2.5),
    ]]
    fillet(f7_edges, radius=F7_R)


with BuildPart() as f2f:
    # F1 (on face) → F2, piece 6 (new body)
    with BuildSketch(Plane.XY):
        Polygon((0.75, -4.75), (0.75, -11.25), (7, -11.25), (7.25, -11.25), (7.25, -10.75), (7, -10.75), (1.25, -10.75), (1.25, -8.25), (7.25, -8.25), (7.25, -7.75), (1.25, -7.75), (1.25, -5.25), (7, -5.25), (7.25, -5.25), (7.25, -4.75), (7, -4.75), align=None)
    extrude(amount=F2_DEPTH)

    # F8 (radius 0.25 in the source; OpenCascade refuses exactly that, so slightly less here)
    f8_edges = [f2f.edges().sort_by_distance(p)[0] for p in [
        (1.25, -5.25, 2.5),
        (7.25, -5.25, 2.5),
        (7.25, -4.75, 2.5),
        (7.25, -8.25, 2.5),
        (7.25, -7.75, 2.5),
        (1.25, -8.25, 2.5),
        (7.25, -11.25, 2.5),
        (7.25, -10.75, 2.5),
        (0.75, -11.25, 2.5),
        (1.25, -10.75, 2.5),
        (1.25, -7.75, 2.5),
        (0.75, -4.75, 2.5),
    ]]
    fillet(f8_edges, radius=F8_R)


with BuildPart() as f2g:
    # F1 (on face) → F2, piece 7 (new body)
    with BuildSketch(Plane.XY):
        Polygon((-6.75, -4.75), (-7.25, -4.75), (-7.25, -11.25), (-6.75, -11.25), (-6.75, -8.4045084972), (-0.6118033989, -11.4736067977), (-0.3881966011, -11.0263932023), (-6.4409830056, -8), (-0.3881966011, -4.9736067977), (-0.6118033989, -4.5263932023), (-6.75, -7.5954915028), align=None)
    extrude(amount=F2_DEPTH)

    # F9 (radius 0.25 in the source; OpenCascade refuses exactly that, so slightly less here)
    f9_edges = [f2g.edges().sort_by_distance(p)[0] for p in [
        (-6.440983, -8, 2.5),
        (-0.388197, -4.973607, 2.5),
        (-0.611803, -4.526393, 2.5),
        (-0.388197, -11.026393, 2.5),
        (-6.75, -11.25, 2.5),
        (-7.25, -11.25, 2.5),
        (-6.75, -4.75, 2.5),
        (-0.611803, -11.473607, 2.5),
        (-6.75, -8.404508, 2.5),
        (-6.75, -7.595492, 2.5),
        (-7.25, -4.75, 2.5),
    ]]
    fillet(f9_edges, radius=F9_R)


solid = Compound([f2.part, f2b.part, f2c.part, f2d.part, f2e.part, f2f.part, f2g.part])
